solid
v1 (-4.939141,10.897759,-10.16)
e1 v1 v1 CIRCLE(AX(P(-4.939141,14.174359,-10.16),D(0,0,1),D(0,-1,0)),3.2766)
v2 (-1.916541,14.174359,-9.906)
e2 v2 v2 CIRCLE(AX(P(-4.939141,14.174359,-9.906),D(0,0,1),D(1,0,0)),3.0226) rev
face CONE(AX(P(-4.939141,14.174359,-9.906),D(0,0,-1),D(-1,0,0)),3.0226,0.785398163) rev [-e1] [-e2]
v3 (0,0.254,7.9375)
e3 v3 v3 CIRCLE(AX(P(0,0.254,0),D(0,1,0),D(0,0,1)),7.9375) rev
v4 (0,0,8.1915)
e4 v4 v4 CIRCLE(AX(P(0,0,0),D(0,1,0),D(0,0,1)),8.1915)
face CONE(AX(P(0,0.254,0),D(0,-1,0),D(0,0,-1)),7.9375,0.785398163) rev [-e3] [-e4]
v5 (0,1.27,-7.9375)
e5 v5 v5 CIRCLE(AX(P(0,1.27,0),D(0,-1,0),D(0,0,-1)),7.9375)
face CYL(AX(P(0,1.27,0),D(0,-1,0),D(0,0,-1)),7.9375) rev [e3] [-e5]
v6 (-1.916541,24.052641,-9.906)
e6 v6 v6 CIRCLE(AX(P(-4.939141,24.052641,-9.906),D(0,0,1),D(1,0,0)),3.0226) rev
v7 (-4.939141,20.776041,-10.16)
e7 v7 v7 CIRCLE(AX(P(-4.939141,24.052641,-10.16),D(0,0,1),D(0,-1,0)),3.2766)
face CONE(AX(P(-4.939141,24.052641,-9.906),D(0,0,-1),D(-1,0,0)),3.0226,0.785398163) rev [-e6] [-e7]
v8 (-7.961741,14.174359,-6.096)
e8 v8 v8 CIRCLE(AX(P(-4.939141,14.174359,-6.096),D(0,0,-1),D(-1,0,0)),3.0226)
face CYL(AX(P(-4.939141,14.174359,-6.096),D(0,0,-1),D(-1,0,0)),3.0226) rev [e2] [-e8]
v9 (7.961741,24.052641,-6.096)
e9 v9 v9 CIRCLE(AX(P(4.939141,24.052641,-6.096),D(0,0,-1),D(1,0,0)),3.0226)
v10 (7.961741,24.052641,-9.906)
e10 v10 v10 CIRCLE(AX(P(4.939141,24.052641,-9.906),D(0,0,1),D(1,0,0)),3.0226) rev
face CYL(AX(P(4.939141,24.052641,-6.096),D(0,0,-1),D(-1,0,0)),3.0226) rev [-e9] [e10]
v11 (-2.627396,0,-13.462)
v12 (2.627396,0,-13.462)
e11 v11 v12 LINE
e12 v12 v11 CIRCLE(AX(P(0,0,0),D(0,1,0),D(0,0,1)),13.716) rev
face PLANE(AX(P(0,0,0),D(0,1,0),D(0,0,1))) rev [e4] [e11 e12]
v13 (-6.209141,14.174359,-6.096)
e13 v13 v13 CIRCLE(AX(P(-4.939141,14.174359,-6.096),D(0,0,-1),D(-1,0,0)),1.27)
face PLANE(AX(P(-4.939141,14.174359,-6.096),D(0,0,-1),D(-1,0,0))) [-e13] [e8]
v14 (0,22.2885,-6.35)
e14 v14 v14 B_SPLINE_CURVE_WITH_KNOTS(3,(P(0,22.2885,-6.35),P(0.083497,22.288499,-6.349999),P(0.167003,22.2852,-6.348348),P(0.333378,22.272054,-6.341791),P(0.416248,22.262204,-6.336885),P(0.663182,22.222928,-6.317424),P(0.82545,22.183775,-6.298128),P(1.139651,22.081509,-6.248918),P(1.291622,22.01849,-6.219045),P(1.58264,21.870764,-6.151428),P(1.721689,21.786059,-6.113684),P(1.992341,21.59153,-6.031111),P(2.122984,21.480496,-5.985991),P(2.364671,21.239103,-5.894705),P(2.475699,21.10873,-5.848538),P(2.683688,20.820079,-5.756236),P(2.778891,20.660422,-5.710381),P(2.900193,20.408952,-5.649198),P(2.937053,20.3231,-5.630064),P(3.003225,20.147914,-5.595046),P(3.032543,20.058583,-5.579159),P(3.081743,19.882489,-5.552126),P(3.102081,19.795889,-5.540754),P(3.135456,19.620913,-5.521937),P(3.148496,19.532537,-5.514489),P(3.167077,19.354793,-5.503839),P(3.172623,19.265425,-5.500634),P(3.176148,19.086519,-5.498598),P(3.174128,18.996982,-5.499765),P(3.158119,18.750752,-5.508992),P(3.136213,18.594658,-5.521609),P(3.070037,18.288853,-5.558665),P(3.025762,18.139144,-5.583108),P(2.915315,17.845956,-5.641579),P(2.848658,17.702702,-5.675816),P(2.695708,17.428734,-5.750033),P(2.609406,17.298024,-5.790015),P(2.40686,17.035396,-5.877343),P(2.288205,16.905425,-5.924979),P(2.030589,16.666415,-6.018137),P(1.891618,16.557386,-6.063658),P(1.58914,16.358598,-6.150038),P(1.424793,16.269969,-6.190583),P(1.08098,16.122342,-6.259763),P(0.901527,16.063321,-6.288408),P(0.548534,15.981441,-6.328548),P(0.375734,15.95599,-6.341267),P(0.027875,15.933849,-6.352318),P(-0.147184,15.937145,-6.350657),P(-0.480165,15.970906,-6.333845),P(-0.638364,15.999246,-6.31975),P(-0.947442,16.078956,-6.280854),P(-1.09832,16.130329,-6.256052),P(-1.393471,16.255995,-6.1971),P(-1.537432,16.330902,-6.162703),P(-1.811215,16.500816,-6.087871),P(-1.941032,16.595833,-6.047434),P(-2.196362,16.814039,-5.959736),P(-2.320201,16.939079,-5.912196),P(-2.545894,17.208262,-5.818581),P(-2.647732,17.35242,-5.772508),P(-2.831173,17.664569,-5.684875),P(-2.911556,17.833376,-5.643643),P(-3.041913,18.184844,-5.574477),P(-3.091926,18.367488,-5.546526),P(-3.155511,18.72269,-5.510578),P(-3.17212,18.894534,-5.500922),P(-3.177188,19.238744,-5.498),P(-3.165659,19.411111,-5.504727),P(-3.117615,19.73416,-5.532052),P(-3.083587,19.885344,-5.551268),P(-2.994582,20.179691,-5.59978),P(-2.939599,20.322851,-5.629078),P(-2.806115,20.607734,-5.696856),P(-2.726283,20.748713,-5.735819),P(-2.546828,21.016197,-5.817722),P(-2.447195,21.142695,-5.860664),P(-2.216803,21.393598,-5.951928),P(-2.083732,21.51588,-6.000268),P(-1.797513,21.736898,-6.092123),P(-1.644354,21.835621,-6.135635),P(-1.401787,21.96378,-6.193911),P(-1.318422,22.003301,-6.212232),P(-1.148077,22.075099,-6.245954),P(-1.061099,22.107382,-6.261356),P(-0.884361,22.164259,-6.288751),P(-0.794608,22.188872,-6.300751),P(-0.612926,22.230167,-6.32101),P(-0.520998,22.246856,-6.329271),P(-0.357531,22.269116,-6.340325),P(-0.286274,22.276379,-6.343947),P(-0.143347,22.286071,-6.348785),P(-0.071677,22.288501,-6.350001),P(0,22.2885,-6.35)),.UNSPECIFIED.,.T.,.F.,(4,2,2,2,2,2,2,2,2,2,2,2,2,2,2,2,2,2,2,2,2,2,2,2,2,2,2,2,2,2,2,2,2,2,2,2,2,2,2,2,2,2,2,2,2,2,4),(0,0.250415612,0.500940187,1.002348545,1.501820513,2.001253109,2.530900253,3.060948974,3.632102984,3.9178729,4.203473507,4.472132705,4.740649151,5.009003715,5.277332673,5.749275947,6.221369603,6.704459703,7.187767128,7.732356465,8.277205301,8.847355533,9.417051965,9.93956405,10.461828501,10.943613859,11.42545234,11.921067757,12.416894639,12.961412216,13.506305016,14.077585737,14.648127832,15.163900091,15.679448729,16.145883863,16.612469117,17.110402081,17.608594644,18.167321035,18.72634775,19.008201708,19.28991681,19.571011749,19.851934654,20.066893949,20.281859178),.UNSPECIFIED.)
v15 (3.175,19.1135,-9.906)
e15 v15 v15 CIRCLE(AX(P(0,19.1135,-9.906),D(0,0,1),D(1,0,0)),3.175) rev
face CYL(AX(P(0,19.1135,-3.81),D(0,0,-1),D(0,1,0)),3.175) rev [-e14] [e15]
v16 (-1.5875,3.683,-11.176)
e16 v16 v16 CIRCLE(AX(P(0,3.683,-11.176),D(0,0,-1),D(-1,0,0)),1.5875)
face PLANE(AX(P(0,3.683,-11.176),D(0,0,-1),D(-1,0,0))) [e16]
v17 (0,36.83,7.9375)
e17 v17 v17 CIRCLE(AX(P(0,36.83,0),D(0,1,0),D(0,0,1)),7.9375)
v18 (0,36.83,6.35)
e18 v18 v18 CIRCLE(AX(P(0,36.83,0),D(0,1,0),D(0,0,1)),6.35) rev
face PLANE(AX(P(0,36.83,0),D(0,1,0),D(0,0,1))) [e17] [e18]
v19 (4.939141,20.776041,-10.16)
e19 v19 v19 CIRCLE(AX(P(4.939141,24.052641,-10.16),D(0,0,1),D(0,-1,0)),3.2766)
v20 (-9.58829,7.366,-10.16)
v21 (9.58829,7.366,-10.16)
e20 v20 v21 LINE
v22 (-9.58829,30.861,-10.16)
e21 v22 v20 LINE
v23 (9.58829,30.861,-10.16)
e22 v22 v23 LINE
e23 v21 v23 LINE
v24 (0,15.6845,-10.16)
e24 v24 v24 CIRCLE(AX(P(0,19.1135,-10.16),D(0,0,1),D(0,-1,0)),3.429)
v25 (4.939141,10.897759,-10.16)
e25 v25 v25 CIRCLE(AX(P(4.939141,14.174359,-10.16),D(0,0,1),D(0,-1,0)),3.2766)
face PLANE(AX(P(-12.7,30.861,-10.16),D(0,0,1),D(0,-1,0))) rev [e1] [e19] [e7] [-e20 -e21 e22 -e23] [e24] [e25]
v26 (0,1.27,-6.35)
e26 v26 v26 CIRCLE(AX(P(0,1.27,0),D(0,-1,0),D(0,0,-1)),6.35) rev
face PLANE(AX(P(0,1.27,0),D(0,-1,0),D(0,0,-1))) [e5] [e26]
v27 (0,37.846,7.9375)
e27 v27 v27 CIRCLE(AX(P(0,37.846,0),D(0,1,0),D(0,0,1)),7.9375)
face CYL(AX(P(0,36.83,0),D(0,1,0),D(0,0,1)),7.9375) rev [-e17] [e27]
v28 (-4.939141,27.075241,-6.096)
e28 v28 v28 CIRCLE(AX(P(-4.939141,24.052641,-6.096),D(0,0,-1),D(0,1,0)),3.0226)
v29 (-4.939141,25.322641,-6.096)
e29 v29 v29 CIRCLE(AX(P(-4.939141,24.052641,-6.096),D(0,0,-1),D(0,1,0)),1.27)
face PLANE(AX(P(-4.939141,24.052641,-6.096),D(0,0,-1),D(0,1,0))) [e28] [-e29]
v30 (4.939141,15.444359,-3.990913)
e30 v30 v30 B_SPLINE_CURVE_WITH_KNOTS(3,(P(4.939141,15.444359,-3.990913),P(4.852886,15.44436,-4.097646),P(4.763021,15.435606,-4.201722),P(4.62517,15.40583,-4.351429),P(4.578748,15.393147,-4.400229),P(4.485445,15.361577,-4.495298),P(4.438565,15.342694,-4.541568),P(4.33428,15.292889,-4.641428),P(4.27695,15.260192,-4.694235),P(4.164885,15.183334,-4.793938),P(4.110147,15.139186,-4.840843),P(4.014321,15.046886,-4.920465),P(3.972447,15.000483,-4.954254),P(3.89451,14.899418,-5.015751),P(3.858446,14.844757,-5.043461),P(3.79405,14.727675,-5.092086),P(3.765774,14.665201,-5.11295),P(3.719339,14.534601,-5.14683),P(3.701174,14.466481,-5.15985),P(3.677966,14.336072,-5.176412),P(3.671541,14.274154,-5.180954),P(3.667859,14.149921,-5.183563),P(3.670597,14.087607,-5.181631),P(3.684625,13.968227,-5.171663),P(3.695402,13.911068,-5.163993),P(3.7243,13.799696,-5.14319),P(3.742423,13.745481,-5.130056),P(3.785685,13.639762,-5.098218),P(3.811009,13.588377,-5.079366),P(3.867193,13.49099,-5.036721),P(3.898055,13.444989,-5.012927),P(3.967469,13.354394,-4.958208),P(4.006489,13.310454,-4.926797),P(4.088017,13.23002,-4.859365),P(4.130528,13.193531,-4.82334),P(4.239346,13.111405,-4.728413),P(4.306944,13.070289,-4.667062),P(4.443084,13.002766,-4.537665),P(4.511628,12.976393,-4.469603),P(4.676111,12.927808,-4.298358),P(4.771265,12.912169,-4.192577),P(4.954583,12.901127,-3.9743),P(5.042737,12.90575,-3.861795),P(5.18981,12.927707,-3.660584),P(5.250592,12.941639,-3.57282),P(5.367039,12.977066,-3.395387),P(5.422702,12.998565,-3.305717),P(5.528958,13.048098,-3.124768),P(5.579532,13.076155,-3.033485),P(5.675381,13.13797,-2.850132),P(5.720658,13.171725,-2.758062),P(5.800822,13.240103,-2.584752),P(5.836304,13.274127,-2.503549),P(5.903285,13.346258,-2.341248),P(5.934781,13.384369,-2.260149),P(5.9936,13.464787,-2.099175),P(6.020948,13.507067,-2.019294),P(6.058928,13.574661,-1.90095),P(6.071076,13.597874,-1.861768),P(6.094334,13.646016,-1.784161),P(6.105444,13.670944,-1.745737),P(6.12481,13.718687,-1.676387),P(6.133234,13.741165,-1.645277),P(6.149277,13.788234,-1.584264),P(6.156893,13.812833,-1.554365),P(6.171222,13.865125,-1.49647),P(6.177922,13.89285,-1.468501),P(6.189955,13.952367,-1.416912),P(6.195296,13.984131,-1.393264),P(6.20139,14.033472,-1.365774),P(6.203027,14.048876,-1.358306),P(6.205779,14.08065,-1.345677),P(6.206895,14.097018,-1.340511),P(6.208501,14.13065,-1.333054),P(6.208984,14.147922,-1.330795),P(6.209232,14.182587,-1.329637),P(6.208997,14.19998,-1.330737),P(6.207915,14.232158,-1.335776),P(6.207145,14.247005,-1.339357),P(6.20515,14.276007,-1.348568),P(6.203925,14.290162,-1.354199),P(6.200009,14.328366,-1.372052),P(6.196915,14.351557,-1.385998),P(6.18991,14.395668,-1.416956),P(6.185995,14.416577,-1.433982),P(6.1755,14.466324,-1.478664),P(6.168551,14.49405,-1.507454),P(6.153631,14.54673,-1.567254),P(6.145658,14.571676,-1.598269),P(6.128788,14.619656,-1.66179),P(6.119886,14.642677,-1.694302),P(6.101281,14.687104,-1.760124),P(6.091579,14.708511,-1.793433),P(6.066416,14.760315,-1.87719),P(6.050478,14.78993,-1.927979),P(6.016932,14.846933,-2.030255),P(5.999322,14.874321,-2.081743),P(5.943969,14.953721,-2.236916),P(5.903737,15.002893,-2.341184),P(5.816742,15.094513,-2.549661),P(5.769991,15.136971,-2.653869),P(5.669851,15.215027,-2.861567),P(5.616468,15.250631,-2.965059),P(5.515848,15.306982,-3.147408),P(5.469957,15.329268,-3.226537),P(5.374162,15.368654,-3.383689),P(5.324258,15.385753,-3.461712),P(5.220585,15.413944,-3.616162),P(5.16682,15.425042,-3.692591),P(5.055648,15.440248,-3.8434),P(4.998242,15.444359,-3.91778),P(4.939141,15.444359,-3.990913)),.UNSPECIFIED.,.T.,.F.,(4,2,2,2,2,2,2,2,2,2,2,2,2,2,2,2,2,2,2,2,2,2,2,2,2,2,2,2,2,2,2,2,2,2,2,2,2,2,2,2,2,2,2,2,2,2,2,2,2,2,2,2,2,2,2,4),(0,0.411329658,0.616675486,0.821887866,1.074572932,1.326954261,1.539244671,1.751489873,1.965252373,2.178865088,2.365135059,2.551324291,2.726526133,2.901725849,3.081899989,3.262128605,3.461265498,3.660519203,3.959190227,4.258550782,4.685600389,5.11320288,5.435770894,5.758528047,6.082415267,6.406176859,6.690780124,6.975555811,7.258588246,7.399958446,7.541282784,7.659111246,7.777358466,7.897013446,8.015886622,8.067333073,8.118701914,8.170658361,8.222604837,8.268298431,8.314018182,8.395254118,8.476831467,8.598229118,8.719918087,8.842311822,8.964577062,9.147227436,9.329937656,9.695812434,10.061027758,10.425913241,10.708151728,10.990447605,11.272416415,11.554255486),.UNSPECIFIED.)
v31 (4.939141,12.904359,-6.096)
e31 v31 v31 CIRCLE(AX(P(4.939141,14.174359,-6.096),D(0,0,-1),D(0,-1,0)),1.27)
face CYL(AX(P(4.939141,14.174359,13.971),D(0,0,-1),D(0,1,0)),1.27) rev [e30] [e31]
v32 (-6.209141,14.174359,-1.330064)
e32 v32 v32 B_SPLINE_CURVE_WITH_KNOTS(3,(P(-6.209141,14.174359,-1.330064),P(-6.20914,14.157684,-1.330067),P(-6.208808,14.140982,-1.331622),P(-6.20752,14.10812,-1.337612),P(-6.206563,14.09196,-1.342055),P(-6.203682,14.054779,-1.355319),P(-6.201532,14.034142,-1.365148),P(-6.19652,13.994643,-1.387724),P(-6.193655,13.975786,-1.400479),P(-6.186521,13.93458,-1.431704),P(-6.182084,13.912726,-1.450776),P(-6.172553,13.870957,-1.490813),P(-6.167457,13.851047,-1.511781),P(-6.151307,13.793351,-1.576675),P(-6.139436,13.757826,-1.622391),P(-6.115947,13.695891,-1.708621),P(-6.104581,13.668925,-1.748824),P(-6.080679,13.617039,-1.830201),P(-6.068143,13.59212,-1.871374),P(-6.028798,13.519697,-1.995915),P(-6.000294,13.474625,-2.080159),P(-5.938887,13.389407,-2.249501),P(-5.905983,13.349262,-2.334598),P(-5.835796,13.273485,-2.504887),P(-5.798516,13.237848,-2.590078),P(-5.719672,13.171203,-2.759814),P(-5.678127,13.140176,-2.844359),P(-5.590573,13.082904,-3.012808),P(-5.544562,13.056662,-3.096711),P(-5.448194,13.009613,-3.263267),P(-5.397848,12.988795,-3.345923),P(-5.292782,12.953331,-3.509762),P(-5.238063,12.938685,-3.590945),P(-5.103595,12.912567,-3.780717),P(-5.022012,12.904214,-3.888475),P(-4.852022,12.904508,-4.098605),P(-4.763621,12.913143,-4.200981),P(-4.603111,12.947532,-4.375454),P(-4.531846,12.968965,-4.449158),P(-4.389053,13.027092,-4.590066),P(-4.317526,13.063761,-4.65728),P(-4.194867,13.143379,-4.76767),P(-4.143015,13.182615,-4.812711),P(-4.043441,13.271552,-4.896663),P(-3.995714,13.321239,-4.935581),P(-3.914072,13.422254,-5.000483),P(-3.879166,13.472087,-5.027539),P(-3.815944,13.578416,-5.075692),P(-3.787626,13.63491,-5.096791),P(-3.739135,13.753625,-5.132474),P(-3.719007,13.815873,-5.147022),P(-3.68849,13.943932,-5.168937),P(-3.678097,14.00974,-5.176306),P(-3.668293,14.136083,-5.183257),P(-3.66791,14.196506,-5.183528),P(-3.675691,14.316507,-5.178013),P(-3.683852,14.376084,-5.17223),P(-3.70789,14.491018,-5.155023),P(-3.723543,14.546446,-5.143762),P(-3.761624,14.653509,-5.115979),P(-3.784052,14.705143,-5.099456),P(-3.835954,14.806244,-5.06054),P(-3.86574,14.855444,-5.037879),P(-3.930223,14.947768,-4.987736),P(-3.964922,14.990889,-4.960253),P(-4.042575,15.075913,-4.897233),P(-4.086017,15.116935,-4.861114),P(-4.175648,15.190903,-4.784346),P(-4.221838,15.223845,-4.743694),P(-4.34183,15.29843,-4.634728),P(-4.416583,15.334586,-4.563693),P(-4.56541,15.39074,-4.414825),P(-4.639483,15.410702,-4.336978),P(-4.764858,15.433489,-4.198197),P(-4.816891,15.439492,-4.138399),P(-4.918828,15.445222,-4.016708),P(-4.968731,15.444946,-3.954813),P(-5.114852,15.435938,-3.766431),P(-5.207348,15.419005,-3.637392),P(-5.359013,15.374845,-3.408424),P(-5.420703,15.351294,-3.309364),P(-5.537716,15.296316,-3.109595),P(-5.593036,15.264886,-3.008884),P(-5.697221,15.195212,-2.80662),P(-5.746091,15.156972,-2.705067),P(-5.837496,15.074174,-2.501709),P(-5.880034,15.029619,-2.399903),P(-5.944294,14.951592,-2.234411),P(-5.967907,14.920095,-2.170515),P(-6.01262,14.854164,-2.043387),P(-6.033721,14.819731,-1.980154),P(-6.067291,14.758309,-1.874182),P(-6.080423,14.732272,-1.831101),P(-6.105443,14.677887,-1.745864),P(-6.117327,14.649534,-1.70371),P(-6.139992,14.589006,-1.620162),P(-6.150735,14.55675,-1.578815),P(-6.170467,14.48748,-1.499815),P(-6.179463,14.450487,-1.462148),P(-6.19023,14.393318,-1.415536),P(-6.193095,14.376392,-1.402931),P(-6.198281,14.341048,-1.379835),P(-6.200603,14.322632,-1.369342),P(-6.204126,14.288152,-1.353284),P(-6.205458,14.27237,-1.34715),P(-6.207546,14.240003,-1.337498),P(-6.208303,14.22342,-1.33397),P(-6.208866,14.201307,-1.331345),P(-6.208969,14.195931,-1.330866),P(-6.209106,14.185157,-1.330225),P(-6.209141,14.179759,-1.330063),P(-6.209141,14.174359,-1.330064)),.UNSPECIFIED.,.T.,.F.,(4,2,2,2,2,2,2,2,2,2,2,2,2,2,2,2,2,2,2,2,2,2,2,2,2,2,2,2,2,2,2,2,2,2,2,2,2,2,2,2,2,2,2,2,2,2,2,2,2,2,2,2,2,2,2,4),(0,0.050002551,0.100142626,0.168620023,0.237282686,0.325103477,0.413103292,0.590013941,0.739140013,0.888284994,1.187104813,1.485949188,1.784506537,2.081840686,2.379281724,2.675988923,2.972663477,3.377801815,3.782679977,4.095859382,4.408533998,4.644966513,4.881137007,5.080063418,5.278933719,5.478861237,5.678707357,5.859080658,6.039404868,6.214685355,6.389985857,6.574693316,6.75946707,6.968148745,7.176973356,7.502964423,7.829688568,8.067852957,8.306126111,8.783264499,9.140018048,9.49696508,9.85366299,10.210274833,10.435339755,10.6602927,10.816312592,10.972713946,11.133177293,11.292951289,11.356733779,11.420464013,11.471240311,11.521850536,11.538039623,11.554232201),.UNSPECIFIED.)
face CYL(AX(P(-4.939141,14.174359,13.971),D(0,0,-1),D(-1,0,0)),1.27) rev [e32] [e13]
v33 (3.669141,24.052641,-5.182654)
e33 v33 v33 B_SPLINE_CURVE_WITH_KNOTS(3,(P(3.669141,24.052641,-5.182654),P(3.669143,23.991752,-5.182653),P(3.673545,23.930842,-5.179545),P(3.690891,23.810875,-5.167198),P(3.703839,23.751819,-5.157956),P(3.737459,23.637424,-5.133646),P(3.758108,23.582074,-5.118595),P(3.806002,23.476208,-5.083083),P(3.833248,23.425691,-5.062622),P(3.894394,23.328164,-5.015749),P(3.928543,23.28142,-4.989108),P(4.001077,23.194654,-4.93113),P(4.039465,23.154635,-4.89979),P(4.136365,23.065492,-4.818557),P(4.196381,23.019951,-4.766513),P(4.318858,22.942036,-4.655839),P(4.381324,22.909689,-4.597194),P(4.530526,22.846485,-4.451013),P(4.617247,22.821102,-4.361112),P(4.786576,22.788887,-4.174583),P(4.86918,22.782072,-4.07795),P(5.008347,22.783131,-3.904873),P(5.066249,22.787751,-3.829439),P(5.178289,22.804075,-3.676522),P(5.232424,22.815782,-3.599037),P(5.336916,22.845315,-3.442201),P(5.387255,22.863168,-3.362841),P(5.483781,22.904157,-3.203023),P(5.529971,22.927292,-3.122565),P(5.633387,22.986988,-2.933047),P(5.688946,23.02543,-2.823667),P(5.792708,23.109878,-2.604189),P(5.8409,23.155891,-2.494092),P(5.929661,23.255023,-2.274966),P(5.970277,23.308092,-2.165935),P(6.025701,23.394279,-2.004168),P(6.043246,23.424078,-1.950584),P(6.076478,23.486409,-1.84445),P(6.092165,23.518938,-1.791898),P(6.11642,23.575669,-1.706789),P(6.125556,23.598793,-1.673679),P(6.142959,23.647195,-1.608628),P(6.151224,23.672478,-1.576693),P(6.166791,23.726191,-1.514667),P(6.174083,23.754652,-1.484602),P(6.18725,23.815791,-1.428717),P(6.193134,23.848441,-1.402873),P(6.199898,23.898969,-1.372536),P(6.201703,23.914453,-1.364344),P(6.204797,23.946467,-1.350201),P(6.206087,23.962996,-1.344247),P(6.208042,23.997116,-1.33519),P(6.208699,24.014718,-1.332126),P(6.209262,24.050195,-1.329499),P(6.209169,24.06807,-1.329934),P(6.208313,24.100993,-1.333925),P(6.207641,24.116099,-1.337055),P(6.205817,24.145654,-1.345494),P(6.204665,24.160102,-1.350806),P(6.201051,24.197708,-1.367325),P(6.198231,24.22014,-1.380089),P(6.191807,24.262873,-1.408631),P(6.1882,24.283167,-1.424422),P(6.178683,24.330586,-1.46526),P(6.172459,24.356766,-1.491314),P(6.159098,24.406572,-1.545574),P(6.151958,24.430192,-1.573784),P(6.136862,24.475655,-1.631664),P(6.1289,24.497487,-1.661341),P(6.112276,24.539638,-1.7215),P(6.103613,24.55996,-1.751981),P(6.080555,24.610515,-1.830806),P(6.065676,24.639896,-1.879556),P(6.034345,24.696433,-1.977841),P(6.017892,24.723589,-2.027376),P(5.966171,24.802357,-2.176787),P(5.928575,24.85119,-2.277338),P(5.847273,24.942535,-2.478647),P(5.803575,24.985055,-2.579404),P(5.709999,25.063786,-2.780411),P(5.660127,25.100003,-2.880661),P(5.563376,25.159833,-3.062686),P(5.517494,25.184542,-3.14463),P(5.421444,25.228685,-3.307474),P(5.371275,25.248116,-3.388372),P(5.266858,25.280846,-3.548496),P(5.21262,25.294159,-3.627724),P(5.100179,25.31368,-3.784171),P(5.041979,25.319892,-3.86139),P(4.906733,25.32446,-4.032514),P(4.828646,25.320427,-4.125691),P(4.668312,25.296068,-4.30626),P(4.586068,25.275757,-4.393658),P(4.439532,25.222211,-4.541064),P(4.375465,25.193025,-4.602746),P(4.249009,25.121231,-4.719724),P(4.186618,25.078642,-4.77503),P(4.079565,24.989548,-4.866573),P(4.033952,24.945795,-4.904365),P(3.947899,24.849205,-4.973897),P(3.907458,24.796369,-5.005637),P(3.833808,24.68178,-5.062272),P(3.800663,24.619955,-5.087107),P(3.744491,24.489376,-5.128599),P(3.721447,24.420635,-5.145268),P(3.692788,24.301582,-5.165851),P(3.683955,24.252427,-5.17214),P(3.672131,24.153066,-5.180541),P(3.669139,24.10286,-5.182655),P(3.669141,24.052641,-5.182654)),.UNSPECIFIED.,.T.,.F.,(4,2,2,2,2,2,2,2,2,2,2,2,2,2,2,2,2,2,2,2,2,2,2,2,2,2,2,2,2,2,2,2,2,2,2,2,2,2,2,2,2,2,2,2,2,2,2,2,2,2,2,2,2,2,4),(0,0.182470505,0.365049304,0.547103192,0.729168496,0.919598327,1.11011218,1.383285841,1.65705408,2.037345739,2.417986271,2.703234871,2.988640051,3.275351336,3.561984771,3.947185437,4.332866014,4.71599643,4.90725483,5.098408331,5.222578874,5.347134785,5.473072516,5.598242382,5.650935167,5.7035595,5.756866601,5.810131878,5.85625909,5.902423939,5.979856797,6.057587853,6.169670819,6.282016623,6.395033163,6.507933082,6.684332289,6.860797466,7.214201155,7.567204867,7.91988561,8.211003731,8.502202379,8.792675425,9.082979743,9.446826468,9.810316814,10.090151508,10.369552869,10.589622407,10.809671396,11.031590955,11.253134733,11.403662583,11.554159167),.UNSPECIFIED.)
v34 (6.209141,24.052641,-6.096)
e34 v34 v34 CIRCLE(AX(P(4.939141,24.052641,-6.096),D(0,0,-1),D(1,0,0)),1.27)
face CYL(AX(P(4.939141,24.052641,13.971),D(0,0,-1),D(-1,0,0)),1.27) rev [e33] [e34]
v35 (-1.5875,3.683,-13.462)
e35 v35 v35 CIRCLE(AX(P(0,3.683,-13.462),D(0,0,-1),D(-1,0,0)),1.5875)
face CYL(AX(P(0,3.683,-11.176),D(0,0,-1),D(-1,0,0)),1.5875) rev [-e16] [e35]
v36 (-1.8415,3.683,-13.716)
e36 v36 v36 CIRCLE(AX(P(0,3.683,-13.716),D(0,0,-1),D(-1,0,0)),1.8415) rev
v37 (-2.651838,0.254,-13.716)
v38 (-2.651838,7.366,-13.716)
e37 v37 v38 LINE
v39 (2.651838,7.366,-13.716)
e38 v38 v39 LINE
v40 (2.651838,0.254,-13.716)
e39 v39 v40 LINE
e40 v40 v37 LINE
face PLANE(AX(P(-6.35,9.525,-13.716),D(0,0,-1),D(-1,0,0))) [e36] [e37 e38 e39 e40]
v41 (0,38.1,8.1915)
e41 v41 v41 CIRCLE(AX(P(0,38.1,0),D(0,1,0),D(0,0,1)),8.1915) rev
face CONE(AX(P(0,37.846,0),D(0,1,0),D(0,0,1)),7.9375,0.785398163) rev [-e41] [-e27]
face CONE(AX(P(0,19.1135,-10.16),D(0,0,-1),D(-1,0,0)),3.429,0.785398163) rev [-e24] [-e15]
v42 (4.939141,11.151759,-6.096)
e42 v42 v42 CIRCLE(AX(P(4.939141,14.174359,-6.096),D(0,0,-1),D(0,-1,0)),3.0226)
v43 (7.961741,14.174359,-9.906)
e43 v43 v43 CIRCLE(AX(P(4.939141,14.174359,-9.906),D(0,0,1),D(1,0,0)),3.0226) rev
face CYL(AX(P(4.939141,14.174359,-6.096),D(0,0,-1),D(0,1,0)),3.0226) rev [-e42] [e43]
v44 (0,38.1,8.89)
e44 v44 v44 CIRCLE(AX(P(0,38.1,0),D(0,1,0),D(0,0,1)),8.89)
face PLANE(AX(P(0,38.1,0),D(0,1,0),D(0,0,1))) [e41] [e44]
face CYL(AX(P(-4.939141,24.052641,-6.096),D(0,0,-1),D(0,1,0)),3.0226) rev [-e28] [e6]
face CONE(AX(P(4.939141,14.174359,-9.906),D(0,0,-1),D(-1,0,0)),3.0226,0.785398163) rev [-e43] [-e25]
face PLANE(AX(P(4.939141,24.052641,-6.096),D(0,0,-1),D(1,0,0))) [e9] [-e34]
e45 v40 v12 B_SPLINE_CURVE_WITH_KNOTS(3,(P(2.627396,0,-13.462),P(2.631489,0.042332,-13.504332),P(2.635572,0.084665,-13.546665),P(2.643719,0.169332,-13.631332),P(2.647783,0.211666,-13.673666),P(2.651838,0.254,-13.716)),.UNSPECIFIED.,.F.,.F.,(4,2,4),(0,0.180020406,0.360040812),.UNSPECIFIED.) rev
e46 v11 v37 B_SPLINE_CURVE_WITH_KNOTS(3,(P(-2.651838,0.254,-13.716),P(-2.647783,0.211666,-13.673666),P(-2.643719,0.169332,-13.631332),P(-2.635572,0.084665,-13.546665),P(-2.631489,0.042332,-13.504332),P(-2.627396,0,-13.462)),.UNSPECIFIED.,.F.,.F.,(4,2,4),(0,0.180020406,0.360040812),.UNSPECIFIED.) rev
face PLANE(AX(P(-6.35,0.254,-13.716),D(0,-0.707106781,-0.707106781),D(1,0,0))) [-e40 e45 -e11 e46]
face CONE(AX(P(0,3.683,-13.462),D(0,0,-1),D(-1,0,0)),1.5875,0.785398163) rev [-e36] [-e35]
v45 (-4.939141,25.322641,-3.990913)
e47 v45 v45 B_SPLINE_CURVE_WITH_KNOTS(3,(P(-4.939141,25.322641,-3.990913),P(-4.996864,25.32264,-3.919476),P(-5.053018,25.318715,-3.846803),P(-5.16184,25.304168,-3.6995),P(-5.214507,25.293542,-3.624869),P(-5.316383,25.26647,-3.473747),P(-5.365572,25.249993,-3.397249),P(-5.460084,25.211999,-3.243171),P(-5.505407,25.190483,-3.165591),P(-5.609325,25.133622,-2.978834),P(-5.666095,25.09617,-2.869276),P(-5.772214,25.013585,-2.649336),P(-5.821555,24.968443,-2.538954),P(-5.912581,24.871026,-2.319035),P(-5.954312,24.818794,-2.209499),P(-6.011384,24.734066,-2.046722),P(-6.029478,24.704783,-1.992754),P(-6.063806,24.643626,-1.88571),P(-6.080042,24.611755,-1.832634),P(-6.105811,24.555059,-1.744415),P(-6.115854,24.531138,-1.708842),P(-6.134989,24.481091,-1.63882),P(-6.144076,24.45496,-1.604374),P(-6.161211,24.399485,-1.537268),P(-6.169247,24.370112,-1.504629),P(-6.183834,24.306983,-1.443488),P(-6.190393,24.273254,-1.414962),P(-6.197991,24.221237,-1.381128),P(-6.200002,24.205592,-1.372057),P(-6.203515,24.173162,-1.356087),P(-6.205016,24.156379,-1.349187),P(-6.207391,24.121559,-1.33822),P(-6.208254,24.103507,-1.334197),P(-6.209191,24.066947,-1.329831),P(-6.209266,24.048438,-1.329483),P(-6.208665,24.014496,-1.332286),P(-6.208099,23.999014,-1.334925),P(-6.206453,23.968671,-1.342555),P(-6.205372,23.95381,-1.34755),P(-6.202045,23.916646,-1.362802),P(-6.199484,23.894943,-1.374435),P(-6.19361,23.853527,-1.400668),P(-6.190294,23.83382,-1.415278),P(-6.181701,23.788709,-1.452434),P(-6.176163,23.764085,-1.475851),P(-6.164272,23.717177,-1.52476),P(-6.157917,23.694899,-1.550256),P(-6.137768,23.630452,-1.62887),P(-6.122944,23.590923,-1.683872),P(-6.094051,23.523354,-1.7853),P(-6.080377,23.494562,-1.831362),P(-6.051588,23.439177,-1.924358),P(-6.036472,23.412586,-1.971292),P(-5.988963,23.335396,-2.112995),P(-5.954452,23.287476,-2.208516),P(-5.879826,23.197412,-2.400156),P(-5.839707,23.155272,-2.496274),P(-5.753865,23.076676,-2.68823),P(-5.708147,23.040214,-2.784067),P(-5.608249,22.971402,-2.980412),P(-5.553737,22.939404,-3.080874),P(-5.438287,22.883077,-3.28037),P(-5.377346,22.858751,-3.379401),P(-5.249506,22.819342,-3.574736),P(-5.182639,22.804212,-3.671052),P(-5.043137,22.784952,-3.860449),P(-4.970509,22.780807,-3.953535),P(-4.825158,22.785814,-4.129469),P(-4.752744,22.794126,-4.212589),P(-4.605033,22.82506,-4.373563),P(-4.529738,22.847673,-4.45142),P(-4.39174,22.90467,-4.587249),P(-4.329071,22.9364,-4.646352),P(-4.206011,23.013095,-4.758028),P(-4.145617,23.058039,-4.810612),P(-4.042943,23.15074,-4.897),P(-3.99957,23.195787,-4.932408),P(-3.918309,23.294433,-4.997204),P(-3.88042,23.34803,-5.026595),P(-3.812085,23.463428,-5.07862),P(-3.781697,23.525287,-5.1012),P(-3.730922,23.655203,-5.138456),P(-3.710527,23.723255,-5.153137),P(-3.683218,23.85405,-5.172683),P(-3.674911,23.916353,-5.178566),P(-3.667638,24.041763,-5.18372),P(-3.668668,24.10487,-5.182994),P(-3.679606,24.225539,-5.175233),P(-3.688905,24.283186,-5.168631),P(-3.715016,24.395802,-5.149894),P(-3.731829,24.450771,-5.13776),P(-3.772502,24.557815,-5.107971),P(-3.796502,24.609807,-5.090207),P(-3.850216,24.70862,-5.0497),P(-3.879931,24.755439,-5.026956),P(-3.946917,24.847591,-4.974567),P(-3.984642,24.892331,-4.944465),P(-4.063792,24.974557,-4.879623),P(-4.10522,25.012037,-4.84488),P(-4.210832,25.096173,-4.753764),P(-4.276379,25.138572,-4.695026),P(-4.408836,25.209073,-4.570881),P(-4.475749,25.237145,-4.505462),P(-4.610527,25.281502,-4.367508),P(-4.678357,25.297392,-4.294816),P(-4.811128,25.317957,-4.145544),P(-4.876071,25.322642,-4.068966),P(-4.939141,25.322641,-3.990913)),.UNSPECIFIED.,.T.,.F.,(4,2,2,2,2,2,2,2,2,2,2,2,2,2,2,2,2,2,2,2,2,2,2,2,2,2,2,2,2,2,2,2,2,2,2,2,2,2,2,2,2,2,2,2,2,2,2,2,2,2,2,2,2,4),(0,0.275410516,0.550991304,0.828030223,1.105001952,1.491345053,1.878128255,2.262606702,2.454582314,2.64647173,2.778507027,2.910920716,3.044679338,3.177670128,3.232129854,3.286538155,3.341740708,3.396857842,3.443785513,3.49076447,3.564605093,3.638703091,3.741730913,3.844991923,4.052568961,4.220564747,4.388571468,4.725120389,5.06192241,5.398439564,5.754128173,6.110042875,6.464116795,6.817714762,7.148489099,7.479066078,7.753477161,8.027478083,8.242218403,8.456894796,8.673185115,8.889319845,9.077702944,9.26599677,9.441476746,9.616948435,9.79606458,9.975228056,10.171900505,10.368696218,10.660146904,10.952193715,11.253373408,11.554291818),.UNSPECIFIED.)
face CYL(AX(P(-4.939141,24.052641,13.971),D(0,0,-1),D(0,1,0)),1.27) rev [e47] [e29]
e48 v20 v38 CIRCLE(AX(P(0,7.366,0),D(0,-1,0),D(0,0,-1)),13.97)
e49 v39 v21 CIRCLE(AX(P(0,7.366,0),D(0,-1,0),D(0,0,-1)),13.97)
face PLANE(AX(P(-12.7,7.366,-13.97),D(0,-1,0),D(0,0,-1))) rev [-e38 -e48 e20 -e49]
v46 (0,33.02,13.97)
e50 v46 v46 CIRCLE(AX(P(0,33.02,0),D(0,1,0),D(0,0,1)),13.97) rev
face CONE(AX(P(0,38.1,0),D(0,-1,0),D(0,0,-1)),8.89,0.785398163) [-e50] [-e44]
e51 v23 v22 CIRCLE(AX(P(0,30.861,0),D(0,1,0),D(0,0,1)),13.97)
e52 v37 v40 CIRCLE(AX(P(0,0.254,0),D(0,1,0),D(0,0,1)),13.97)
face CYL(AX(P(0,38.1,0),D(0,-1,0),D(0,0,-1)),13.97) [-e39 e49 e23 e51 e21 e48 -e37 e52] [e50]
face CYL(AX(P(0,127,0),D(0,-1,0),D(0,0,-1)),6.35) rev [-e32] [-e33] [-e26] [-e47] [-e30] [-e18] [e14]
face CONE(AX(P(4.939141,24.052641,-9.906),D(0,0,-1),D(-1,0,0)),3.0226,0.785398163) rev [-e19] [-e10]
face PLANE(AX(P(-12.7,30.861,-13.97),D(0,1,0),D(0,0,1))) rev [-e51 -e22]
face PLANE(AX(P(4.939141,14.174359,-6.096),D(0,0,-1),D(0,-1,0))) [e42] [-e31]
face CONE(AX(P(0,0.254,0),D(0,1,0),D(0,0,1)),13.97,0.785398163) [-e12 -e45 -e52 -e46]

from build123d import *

# Parameters (mm, degrees)
SKETCH2_R               = 13.97
BOSS_EXTRUDE1_DEPTH     = 38.1
CHAMFER1_SIZE           = 5.08
SKETCH4_R               = 6.35
CUT_EXTRUDE1_DEPTH      = 127
SKETCH5_R               = 7.9375
CUT_EXTRUDE2_DEPTH      = 1.27
CUT_EXTRUDE3_START      = -1.27
SKETCH6_R               = 7.9375
CUT_EXTRUDE3_DEPTH      = 1.27
SKETCH8_W               = 3.81
SKETCH8_H               = 23.495
CUT_EXTRUDE4_DEPTH      = 12.7
SKETCH9_W               = 12.7
SKETCH9_H               = 0.508
CUT_EXTRUDE5_DEPTH      = 9.525
SKETCH10_R              = 1.5875
CUT_EXTRUDE6_DEPTH      = 2.54
SKETCH11_R              = 3.175
CUT_EXTRUDE7_DEPTH      = 6.35
SKETCH12_R              = 3.0226
CUT_EXTRUDE8_DEPTH      = 4.064
CIRPATTERN1_COUNT       = 4
CUT_EXTRUDE9_REACH      = 47.27
CUT_EXTRUDE9_END_RADIUS = 6.35
SKETCH13_R              = 1.27
CIRPATTERN2_START       = -6.096
CIRPATTERN2_OUTLINE_R   = 1.27
CIRPATTERN2_DEPTH       = 6.096
CHAMFER2_SIZE           = 0.254


with BuildPart() as part:
    # Sketch2 → Boss-Extrude1 (new body)
    with BuildSketch(Plane(origin=(0, 0, 0), x_dir=(1, 0, 0), z_dir=(0, 1, 0))):
        with Locations(Location((0, 0, 0), (0, 0, 90))):
            Circle(SKETCH2_R)
    extrude(amount=BOSS_EXTRUDE1_DEPTH)

    # Chamfer1
    chamfer1_edges = [part.edges().sort_by_distance(p)[0] for p in [
        (0, 38.1, 13.97),
    ]]
    chamfer(chamfer1_edges, length=CHAMFER1_SIZE)

    # Sketch4 → Cut-Extrude1 (cut)
    with BuildSketch(Plane.XZ):
        with Locations(Location((0, 0, 0), (0, 0, 270))):
            Circle(SKETCH4_R)
    extrude(amount=-CUT_EXTRUDE1_DEPTH, mode=Mode.SUBTRACT)

    # Sketch5 → Cut-Extrude2 (cut)
    with BuildSketch(Plane(origin=(0, 38.1, 0), x_dir=(1, 0, 0), z_dir=(0, 1, 0))):
        with Locations(Location((0, 0, 0), (0, 0, 270))):
            Circle(SKETCH5_R)
    extrude(amount=-CUT_EXTRUDE2_DEPTH, mode=Mode.SUBTRACT)

    # Sketch6 → Cut-Extrude3 (cut)
    with BuildSketch(Plane.XZ.offset(CUT_EXTRUDE3_START)):
        with Locations(Location((0, 0, 0), (0, 0, 90))):
            Circle(SKETCH6_R)
    extrude(amount=CUT_EXTRUDE3_DEPTH, mode=Mode.SUBTRACT)

    # Sketch8 → Cut-Extrude4 (cut, symmetric)
    with BuildSketch(Plane(origin=(0, 0, 0), x_dir=(0, 0, -1), z_dir=(1, 0, 0))):
        with Locations((12.065, 19.1135)):
            Rectangle(SKETCH8_W, SKETCH8_H)
    extrude(amount=CUT_EXTRUDE4_DEPTH, both=True, mode=Mode.SUBTRACT)

    # Sketch9 → Cut-Extrude5 (cut, symmetric)
    with BuildSketch(Plane(origin=(0, 0, 0), x_dir=(1, 0, 0), z_dir=(0, 1, 0))):
        with Locations((0, 13.97)):
            Rectangle(SKETCH9_W, SKETCH9_H)
    extrude(amount=CUT_EXTRUDE5_DEPTH, both=True, mode=Mode.SUBTRACT)

    # Sketch10 → Cut-Extrude6 (cut, symmetric)
    with BuildSketch(Plane(origin=(0, 0, -13.716), x_dir=(-1, 0, 0), z_dir=(0, 0, -1))):
        with Locations((0, 3.683)):
            Circle(SKETCH10_R)
    extrude(amount=CUT_EXTRUDE6_DEPTH, both=True, mode=Mode.SUBTRACT)

    # Sketch11 → Cut-Extrude7 (cut, symmetric)
    with BuildSketch(Plane(origin=(0, 0, -10.16), x_dir=(-1, 0, 0), z_dir=(0, 0, -1))):
        with Locations(Location((0, 19.1135, 0), (0, 0, 270))):
            Circle(SKETCH11_R)
    extrude(amount=CUT_EXTRUDE7_DEPTH, both=True, mode=Mode.SUBTRACT)

    # Sketch12 → Cut-Extrude8 (cut)
    with BuildSketch(Plane(origin=(0, 0, -10.16), x_dir=(-1, 0, 0), z_dir=(0, 0, -1))):
        with Locations(Location((4.939140867, 24.052640867, 0), (0, 0, 90))):
            Circle(SKETCH12_R)
    cut_extrude8 = extrude(amount=-CUT_EXTRUDE8_DEPTH, mode=Mode.SUBTRACT)

    # CirPattern1: Cut-Extrude8 ×4 about axis
    cirpattern1_axis = Axis((0, 19.1135, 0), (0, 0, 1))
    for i in range(1, CIRPATTERN1_COUNT):
        add(cut_extrude8.rotate(cirpattern1_axis, i * 360 / CIRPATTERN1_COUNT), mode=Mode.SUBTRACT)

    # Cut-Extrude9: up to this cylinder (the profile starts outside it)
    cut_extrude9_end = Plane(origin=(0, 14.174359, 0), z_dir=(0, -1, 0)) * Cylinder(CUT_EXTRUDE9_END_RADIUS, 108.24, mode=Mode.PRIVATE)
    # Sketch13 → Cut-Extrude9 (cut, up to the surface)
    with BuildSketch(Plane(origin=(0, 0, -6.096), x_dir=(-1, 0, 0), z_dir=(0, 0, -1)), mode=Mode.PRIVATE) as cut_extrude9_sk1:
        with Locations((4.939140867, 14.174359133)):
            Circle(SKETCH13_R)
    cut_extrude9_tool1 = extrude(cut_extrude9_sk1.sketch, amount=-CUT_EXTRUDE9_REACH, mode=Mode.PRIVATE) - cut_extrude9_end
    add(cut_extrude9_tool1.solids().sort_by_distance((-4.939141, 14.174359, -6.096))[0], mode=Mode.SUBTRACT)

    # CirPattern2: read off the stored shape, not the designer's step
    # CirPattern2 outline → CirPattern2 (cut)
    with BuildSketch(Plane.XY.offset(CIRPATTERN2_START)):
        with Locations((-4.939140867, 24.052640867)):
            Circle(CIRPATTERN2_OUTLINE_R)
        with Locations((4.939140867, 24.052640867)):
            Circle(CIRPATTERN2_OUTLINE_R)
        with Locations((4.939140867, 14.174359133)):
            Circle(CIRPATTERN2_OUTLINE_R)
    extrude(amount=CIRPATTERN2_DEPTH, mode=Mode.SUBTRACT)

    # Chamfer2
    chamfer2_edges = [part.edges().sort_by_distance(p)[0] for p in [
        (0, 38.1, -7.9375),
        (0, 0, -7.9375),
        (0, 0, 13.97),
        (0, 0, -13.716),
        (1.5875, 3.683, -13.716),
        (0, 22.2885, -10.16),
        (-4.939140867, 21.030040867, -10.16),
        (-1.916540867, 14.174359133, -10.16),
        (4.939140867, 17.196959133, -10.16),
        (1.916540867, 24.052640867, -10.16),
    ]]
    chamfer(chamfer2_edges, length=CHAMFER2_SIZE - 0.0001)  # a hair under: the kernel refuses the full size


solid = part.part
